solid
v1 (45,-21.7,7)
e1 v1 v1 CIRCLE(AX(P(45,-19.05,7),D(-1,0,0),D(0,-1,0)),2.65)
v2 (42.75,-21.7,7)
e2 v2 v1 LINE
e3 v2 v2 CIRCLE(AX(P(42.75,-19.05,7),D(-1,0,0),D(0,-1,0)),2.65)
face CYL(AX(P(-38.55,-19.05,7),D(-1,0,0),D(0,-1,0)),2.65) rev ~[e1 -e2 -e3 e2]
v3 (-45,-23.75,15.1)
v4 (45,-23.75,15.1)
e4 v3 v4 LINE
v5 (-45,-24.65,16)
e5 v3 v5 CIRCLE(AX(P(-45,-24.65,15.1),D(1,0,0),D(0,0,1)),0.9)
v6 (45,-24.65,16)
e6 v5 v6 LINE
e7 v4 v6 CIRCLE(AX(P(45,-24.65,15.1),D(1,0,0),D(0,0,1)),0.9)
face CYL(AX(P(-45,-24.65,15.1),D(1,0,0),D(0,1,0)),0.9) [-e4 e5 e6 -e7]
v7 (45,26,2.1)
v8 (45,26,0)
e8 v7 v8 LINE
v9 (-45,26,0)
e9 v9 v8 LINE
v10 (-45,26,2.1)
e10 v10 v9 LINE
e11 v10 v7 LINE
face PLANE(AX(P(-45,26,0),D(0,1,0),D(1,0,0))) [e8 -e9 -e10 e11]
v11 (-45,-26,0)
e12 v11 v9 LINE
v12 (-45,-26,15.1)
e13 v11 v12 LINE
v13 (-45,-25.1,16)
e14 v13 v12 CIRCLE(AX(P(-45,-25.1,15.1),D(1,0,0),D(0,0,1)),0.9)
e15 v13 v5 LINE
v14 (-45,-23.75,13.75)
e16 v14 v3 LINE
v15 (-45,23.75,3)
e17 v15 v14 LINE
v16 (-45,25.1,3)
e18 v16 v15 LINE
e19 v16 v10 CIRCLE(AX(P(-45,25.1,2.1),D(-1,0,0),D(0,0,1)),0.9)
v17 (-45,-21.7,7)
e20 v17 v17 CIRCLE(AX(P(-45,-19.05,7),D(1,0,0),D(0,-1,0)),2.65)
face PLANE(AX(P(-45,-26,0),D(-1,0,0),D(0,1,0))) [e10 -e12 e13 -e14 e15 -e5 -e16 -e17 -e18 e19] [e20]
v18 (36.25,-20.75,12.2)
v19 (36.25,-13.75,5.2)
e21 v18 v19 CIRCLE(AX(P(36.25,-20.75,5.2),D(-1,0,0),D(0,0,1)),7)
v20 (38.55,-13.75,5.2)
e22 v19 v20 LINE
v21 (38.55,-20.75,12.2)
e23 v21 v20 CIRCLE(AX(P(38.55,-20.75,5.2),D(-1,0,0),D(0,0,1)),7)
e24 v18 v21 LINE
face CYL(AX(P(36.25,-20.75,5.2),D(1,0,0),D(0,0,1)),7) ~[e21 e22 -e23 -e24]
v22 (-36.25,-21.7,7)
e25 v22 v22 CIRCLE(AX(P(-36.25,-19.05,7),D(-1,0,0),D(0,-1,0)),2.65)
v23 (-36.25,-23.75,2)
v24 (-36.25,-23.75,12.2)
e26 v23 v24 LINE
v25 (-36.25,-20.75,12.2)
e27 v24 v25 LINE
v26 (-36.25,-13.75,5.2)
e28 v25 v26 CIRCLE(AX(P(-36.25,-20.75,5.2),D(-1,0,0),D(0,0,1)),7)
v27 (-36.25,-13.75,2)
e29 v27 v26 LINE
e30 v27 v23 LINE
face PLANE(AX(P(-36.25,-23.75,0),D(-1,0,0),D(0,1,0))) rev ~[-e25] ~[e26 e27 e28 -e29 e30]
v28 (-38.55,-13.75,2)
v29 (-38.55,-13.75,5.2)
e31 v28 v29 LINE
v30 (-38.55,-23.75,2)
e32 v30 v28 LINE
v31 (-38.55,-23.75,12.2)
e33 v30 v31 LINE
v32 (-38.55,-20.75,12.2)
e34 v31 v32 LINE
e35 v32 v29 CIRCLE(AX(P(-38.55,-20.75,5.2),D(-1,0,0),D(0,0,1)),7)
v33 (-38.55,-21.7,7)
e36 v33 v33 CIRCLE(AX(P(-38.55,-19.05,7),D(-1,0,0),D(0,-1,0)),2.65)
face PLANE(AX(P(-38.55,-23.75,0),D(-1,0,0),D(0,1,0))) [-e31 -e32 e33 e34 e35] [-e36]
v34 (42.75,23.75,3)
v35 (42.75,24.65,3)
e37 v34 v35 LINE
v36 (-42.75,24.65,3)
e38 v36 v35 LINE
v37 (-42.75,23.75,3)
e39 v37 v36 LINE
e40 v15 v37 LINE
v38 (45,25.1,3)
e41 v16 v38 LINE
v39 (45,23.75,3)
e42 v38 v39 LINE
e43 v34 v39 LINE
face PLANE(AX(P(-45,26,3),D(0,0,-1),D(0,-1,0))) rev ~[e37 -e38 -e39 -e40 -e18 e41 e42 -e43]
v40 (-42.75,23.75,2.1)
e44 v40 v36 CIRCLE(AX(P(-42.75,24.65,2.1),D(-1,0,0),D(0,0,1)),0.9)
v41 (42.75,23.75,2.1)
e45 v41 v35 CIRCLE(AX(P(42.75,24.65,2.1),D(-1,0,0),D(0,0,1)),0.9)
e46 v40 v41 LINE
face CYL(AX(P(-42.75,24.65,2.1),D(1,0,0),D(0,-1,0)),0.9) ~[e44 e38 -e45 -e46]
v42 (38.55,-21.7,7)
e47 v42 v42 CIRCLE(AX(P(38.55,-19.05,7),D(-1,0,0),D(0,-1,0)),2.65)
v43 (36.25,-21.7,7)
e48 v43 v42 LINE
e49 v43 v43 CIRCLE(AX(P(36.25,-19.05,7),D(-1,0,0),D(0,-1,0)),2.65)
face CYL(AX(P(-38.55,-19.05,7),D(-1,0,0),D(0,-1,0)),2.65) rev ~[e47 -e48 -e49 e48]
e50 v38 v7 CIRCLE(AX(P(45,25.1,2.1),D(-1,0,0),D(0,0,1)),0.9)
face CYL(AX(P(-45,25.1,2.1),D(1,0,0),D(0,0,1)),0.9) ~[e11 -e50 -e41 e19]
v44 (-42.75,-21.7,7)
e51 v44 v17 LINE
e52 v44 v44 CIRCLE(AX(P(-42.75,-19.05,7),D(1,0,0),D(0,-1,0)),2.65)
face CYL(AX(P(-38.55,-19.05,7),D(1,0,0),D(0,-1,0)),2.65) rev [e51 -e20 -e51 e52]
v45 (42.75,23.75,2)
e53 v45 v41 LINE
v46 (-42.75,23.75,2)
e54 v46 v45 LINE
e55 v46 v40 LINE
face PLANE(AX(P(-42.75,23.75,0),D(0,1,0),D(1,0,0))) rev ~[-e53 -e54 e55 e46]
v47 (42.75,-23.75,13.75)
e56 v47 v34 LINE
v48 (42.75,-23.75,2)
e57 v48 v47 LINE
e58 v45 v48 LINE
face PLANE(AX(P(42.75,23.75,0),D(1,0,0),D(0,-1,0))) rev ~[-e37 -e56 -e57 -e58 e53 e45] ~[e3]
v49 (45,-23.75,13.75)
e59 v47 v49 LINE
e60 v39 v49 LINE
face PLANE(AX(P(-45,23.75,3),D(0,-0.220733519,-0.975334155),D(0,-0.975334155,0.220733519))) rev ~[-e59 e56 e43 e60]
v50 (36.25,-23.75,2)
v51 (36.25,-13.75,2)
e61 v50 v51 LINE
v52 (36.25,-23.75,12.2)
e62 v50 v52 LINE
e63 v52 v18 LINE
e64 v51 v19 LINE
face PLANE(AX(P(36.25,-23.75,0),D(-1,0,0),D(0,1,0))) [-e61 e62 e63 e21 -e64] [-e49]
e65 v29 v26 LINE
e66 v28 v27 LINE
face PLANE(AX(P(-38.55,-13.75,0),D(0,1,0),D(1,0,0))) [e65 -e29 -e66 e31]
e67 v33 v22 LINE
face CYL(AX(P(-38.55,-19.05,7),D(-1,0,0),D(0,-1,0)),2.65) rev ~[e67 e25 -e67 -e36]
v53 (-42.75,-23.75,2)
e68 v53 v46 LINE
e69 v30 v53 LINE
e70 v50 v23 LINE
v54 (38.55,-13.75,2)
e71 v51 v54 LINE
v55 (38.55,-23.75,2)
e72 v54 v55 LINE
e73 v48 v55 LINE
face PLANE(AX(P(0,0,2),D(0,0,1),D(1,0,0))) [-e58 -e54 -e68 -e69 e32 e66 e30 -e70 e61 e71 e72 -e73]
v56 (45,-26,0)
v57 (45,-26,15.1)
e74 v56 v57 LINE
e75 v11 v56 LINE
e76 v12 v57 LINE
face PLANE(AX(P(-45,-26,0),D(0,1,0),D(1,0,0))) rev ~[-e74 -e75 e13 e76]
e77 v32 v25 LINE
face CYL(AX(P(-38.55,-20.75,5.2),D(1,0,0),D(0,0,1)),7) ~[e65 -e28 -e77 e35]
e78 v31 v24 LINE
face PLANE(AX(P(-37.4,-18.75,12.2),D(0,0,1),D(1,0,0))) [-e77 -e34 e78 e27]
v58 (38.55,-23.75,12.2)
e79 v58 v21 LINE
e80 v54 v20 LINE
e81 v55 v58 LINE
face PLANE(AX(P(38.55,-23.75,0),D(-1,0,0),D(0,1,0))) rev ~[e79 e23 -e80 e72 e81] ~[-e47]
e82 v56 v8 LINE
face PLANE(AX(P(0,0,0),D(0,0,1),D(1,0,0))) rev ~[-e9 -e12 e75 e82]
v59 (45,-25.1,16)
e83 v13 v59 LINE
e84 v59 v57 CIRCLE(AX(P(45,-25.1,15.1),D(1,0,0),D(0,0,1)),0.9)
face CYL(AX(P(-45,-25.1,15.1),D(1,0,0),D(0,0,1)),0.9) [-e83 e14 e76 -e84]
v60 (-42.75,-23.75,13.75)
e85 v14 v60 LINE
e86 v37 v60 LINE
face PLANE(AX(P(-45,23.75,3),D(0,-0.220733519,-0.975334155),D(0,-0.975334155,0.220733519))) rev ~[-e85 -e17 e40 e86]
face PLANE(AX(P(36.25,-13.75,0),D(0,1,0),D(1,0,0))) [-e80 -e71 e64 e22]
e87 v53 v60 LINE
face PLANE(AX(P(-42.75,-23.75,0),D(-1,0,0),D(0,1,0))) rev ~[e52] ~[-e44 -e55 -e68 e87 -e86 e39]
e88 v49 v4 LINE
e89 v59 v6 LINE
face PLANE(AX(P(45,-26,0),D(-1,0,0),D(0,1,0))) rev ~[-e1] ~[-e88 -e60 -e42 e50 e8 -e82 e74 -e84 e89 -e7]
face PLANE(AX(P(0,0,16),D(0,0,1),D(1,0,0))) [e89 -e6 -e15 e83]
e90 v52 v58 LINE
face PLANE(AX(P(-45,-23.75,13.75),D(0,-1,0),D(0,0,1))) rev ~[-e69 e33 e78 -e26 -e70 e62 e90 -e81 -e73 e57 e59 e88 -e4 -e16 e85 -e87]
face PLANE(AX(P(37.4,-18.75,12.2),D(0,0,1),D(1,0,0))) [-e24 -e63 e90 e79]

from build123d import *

# Parameters (mm, degrees)
F0_W          = 90
F0_H          = 52
F1_DEPTH      = 16
F3_DEPTH      = 1323
F0_W_2        = 2.3
F0_H_2        = 10
F4_DEPTH      = 12.2
F5_R          = 2.65
F6_DEPTH      = 100
F6_DEPTH_BACK = 25
F7_DEPTH      = 2
F8_R          = 7
F9_R          = 0.9


with BuildPart() as f1:
    # F0 (on Top) → F1 (new body)
    with BuildSketch(Plane.XY):
        Rectangle(F0_W, F0_H)
        Polygon((-42.75, 23.75), (42.75, 23.75), (42.75, -23.75), (38.55, -23.75), (36.25, -23.75), (-36.25, -23.75), (-38.55, -23.75), (-42.75, -23.75), align=None, mode=Mode.SUBTRACT)
    extrude(amount=F1_DEPTH)

    # F2 (on face) → F3 (cut)
    with BuildSketch(Plane(origin=(-45, 0, 0), x_dir=(0, -1, 0), z_dir=(-1, 0, 0))):
        Polygon((-26, 16), (-26, 3), (-23.75, 3), (23.75, 13.75), (23.75, 16), align=None)
    extrude(amount=-F3_DEPTH, mode=Mode.SUBTRACT)

    # F0 (on Top) → F4 (join)
    with BuildSketch(Plane.XY):
        with Locations((-37.4, -18.75)):
            Rectangle(F0_W_2, F0_H_2)
        with Locations((37.4, -18.75)):
            Rectangle(F0_W_2, F0_H_2)
    extrude(amount=F4_DEPTH)

    # F5 (on face) → F6 (cut, two sides)
    with BuildSketch(Plane(origin=(-38.55, 0, 0), x_dir=(0, -1, 0), z_dir=(-1, 0, 0))) as f6_sk:
        with Locations((19.05, 7)):
            Circle(F5_R)
    extrude(amount=-F6_DEPTH, mode=Mode.SUBTRACT)
    extrude(f6_sk.sketch, amount=F6_DEPTH_BACK, mode=Mode.SUBTRACT)

    # F0 (on Top) → F7 (join)
    with BuildSketch(Plane.XY):
        Rectangle(F0_W, F0_H)
        Polygon((-42.75, 23.75), (42.75, 23.75), (42.75, -23.75), (38.55, -23.75), (36.25, -23.75), (-36.25, -23.75), (-38.55, -23.75), (-42.75, -23.75), align=None, mode=Mode.SUBTRACT)
        Polygon((42.75, -23.75), (42.75, 23.75), (-42.75, 23.75), (-42.75, -23.75), (-38.55, -23.75), (-38.55, -13.75), (-36.25, -13.75), (-36.25, -23.75), (36.25, -23.75), (36.25, -13.75), (38.55, -13.75), (38.55, -23.75), align=None)
    extrude(amount=F7_DEPTH)

    # F8
    f8_edges = [f1.edges().sort_by_distance(p)[0] for p in [
        (-37.4, -13.75, 12.2),
        (37.4, -13.75, 12.2),
    ]]
    fillet(f8_edges, radius=F8_R)

    # F9
    f9_edges = [f1.edges().sort_by_distance(p)[0] for p in [
        (0, -26, 16),
        (0, -23.75, 16),
        (0, 23.75, 3),
        (0, 26, 3),
    ]]
    fillet(f9_edges, radius=F9_R)


solid = f1.part
